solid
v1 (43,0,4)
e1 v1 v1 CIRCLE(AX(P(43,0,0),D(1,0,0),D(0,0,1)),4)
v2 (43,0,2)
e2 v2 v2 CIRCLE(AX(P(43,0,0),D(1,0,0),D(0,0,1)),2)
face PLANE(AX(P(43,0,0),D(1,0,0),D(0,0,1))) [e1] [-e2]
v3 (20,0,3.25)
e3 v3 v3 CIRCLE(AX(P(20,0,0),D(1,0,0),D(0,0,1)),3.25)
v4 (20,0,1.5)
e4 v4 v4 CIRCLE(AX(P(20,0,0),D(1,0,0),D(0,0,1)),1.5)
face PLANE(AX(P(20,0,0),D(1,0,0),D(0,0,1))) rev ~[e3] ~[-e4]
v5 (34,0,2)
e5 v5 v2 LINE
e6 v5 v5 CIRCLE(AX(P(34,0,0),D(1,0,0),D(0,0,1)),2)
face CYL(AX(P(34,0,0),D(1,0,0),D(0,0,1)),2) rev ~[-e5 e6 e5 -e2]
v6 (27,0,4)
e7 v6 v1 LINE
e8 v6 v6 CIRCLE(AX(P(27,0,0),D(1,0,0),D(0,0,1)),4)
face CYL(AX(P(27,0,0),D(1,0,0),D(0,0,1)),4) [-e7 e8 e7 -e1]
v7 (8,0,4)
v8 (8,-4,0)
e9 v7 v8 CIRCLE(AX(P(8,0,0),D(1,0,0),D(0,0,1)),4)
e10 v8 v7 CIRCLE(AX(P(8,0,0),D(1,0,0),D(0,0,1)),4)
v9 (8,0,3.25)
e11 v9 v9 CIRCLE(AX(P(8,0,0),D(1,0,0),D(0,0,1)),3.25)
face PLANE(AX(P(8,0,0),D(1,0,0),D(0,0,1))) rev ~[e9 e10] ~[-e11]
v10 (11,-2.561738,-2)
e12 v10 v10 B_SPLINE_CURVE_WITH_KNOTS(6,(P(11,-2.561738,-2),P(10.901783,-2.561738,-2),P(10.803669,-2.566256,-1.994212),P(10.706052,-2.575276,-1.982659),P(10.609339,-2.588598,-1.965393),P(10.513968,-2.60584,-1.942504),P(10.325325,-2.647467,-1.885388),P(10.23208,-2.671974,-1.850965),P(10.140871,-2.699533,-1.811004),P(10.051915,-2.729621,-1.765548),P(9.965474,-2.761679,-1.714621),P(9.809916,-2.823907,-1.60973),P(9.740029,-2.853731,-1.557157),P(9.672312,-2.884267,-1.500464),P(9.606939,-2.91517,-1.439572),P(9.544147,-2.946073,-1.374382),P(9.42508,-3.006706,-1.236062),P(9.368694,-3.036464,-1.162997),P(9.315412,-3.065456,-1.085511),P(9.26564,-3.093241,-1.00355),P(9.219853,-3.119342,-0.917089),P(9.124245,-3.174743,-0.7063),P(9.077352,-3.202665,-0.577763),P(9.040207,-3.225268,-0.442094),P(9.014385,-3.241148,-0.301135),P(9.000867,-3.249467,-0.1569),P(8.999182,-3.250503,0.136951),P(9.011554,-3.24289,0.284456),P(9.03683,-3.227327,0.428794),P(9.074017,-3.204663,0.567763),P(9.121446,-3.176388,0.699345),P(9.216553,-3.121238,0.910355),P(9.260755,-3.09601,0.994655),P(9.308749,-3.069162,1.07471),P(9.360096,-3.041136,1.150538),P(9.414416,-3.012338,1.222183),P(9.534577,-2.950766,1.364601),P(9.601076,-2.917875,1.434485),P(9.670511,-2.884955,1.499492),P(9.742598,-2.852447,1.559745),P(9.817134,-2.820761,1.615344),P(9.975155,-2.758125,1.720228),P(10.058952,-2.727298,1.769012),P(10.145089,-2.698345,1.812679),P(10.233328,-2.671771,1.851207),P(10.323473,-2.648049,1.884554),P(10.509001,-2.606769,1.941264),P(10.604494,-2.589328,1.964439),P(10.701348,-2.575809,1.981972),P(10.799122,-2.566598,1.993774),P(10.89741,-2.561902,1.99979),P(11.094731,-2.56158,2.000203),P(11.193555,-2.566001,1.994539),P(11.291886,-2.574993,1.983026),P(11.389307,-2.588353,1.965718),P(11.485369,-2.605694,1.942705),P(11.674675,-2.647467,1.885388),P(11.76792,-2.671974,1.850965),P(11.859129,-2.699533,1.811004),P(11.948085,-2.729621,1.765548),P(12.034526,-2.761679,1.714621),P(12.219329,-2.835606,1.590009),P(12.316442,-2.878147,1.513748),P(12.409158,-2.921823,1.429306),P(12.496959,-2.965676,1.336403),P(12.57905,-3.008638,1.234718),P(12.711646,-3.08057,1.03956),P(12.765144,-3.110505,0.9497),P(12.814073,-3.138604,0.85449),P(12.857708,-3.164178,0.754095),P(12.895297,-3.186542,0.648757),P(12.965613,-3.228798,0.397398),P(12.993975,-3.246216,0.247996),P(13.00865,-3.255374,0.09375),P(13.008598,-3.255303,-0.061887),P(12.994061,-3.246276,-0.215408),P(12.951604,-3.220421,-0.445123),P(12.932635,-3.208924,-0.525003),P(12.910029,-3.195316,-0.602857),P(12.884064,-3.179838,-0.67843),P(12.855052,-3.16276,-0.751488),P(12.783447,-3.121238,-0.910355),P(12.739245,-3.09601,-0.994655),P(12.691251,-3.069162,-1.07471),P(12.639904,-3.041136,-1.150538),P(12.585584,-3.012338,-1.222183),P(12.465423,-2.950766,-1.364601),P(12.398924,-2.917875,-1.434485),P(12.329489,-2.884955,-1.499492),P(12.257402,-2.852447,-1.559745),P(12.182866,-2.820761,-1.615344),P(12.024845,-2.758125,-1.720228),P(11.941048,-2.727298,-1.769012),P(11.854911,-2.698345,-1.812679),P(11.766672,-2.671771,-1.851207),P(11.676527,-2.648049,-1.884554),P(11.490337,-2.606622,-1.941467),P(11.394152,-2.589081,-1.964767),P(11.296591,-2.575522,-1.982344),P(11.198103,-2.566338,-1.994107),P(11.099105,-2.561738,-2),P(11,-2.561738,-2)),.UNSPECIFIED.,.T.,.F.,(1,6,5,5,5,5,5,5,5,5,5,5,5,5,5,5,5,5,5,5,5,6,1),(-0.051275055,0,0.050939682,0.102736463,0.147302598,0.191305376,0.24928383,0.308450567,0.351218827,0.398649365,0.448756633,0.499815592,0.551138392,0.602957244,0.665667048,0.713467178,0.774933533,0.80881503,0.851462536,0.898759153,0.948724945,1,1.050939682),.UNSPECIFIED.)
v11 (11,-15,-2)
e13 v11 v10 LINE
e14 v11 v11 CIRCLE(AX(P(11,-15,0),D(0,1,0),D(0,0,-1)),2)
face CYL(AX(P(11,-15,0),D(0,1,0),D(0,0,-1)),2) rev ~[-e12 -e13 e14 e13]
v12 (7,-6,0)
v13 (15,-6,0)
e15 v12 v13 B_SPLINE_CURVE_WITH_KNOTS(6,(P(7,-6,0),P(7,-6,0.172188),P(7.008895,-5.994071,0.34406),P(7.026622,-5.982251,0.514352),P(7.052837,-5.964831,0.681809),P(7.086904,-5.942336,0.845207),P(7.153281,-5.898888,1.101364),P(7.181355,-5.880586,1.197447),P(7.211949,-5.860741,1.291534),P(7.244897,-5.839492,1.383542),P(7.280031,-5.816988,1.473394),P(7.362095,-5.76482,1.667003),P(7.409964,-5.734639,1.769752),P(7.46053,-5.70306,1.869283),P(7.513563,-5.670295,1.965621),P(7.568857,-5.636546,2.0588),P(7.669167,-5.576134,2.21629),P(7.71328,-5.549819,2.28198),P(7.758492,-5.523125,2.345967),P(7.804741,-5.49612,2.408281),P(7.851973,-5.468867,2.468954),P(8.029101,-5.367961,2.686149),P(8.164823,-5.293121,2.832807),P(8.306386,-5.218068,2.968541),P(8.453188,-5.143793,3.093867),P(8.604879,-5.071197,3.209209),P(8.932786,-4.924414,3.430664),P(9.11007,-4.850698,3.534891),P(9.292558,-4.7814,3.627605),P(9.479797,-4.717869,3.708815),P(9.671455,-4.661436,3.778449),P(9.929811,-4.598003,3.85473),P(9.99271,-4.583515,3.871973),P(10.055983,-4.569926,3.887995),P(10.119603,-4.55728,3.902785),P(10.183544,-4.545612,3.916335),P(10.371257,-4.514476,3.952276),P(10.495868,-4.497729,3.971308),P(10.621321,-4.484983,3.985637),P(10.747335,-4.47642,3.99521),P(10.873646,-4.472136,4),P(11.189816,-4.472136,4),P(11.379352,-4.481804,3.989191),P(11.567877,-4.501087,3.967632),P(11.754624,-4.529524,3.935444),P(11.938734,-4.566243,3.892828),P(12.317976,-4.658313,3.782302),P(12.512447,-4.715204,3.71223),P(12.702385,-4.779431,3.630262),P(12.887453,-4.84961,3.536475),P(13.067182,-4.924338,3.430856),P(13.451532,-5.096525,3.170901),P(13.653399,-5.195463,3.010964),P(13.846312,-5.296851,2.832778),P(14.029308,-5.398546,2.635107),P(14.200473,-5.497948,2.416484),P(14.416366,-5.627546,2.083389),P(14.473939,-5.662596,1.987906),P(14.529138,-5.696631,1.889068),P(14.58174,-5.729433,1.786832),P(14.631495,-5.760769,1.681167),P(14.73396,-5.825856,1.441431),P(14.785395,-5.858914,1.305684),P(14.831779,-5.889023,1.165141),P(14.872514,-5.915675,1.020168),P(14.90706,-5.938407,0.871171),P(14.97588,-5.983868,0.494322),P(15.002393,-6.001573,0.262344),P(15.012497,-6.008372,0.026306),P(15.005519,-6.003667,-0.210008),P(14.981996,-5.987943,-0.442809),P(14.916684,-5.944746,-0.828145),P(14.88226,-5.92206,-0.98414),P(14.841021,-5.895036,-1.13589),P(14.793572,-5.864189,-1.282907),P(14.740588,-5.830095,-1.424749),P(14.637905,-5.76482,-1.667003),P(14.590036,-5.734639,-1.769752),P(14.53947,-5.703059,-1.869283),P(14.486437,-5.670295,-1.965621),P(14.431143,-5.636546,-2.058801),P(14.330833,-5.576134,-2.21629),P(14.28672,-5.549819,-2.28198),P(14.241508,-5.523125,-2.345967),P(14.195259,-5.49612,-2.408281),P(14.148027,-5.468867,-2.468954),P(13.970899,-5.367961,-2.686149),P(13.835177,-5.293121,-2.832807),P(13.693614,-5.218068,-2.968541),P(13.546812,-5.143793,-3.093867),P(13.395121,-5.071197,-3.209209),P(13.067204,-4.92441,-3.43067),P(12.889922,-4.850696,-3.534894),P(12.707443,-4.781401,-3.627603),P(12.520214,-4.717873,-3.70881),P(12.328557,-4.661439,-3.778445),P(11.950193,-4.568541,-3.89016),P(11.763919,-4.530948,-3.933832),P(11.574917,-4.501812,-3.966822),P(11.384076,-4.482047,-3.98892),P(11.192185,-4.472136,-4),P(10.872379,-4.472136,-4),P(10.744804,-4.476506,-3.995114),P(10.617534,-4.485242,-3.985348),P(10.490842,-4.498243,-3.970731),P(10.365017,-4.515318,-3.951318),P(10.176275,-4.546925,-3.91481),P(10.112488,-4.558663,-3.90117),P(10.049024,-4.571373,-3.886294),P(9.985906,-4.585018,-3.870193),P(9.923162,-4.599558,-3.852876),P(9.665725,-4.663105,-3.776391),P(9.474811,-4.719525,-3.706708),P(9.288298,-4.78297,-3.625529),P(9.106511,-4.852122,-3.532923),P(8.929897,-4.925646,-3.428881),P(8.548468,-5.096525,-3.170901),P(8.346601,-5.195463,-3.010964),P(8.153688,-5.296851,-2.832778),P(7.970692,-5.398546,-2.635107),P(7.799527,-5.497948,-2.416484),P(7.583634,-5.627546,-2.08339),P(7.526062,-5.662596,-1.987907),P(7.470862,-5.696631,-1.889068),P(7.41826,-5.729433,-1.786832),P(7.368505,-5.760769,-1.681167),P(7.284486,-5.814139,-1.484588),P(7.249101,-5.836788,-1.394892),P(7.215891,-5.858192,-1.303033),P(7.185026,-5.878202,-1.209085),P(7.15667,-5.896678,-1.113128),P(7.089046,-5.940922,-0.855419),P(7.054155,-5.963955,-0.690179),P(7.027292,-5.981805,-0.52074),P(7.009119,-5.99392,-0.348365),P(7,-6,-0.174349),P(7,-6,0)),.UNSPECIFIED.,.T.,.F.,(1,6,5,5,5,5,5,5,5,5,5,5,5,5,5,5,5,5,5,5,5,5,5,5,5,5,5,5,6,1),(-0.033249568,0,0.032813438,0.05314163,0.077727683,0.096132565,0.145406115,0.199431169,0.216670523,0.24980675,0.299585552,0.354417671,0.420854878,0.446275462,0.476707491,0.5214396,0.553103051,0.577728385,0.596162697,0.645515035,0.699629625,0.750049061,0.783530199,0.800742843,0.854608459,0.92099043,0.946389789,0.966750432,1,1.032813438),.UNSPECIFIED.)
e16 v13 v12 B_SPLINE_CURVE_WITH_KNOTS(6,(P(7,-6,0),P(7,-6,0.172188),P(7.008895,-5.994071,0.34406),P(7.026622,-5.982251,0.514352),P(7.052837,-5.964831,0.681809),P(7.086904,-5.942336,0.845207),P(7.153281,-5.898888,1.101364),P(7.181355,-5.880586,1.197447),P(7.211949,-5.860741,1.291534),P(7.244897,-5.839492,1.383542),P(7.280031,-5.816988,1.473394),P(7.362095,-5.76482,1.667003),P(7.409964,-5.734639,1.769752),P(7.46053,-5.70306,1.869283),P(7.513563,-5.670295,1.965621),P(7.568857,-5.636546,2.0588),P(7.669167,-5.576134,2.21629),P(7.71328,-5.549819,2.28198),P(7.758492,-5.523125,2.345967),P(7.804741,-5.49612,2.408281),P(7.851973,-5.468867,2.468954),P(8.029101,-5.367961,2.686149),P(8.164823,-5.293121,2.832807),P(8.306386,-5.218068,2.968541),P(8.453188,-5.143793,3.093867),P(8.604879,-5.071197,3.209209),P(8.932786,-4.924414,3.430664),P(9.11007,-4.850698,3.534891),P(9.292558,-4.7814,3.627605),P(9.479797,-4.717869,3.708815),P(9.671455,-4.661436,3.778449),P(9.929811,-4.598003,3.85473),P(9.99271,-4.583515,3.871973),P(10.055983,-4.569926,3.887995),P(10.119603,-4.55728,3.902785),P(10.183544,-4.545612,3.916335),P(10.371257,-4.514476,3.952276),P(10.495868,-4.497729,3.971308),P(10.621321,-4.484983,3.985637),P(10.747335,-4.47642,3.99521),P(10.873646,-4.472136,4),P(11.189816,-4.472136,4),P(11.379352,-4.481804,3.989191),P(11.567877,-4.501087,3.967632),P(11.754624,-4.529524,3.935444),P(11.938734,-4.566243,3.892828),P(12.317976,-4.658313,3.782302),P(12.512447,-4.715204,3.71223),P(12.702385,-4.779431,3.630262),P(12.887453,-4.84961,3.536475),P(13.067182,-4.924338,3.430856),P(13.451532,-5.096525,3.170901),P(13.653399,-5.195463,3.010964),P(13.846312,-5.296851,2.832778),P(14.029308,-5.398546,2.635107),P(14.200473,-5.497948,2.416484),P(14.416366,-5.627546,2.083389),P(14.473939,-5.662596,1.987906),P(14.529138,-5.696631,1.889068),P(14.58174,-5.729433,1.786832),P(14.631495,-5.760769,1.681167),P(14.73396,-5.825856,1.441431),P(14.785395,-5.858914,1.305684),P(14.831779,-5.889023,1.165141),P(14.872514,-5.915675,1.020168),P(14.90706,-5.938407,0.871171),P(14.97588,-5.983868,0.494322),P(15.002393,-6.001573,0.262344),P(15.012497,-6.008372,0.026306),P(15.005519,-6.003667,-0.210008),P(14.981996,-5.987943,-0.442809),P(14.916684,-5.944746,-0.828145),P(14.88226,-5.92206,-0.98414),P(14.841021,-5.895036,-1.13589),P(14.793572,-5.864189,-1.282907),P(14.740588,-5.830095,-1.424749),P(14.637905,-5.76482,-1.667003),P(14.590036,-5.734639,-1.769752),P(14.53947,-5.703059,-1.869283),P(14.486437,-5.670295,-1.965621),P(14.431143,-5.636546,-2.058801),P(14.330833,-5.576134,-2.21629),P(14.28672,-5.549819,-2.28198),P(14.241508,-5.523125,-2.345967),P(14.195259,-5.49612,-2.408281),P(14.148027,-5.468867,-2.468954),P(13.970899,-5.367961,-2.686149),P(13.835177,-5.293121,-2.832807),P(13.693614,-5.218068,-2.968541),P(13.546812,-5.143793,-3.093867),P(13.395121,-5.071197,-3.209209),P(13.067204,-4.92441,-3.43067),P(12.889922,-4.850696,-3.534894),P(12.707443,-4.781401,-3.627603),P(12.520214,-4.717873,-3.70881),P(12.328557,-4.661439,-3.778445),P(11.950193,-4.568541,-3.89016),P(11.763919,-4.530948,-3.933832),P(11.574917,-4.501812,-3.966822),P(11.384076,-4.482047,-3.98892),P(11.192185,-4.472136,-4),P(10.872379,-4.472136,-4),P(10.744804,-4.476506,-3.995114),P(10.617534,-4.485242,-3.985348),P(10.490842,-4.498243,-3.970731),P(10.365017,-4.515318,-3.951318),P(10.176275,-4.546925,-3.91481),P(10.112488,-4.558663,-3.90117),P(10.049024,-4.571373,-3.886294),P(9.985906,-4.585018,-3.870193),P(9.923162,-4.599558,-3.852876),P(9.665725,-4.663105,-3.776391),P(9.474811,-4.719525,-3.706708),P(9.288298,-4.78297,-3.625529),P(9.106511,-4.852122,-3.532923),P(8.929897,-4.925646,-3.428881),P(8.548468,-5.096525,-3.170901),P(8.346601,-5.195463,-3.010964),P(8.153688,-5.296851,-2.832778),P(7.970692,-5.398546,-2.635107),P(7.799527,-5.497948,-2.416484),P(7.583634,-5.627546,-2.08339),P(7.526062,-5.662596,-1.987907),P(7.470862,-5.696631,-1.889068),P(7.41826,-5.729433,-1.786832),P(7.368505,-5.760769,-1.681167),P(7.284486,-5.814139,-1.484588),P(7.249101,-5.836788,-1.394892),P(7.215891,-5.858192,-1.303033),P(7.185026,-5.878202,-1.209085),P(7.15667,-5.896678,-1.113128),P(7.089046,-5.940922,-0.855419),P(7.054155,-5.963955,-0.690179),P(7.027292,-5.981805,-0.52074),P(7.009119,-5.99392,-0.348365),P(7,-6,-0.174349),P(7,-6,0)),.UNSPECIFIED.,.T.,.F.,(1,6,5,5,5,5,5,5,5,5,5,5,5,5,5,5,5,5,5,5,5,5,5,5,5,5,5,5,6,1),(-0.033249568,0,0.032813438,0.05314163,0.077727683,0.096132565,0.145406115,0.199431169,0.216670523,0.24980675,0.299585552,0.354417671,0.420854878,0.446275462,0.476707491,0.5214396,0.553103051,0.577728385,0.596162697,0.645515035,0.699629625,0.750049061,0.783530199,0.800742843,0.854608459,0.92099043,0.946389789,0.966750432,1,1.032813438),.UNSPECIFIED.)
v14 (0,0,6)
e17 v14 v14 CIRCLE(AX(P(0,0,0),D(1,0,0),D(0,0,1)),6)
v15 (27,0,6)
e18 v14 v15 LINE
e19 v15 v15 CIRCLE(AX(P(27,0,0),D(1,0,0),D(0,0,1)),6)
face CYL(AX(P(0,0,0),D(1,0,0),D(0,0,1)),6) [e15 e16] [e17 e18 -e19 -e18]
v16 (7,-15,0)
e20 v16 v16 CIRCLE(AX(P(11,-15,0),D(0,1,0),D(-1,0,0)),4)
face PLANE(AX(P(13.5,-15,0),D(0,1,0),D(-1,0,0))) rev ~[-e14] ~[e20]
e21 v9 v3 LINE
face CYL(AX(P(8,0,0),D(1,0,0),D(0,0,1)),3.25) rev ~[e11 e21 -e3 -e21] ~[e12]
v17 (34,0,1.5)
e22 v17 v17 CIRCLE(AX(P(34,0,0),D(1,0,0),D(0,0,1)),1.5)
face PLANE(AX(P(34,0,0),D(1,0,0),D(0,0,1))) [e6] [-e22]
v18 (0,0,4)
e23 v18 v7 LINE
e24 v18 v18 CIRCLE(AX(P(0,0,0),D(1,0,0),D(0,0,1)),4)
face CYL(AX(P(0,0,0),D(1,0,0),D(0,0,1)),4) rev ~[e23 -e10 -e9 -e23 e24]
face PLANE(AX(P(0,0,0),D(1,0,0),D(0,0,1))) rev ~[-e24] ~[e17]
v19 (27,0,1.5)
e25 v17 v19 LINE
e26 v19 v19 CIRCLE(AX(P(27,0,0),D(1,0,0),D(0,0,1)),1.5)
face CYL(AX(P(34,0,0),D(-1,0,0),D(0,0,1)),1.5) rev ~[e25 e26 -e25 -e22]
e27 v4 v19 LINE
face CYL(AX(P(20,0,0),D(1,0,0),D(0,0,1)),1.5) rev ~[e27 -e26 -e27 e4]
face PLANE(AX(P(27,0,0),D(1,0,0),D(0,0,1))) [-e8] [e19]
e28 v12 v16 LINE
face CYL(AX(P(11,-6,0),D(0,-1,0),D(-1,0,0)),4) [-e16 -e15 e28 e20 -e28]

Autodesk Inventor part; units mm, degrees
ref_plane "YZ Plane" through (0, 0, 0) normal (1, 0, 0) x (0, 1, 0)
ref_plane "XY Plane" through (0, 0, 0) normal (0, 0, 1) x (1, 0, 0)
sketch "Sketch1" plane through (0, 0, 0) normal (0, 1, 0) x (-1, 0, 0)
  line L0 (0, 0) -> (-52, 0)
  line L1 (0, 4) -> (-8, 4)
  line L2 (0, 6) -> (-27, 6)
  line L3 (0, 0) -> (0, 37) construction
  line L4 (-8, 3.25) -> (-20, 3.25)
  line L5 (-8, 4) -> (-8, 3.25)
  line L6 (-20, 1.5) -> (-27, 1.5)
  line L7 (-20, 3.25) -> (-20, 1.5)
  line L8 (-27, 6) -> (-27, 4)
  line L9 (-27, 4) -> (-43, 4)
  line L10 (-34, 2) -> (-43, 2)
  line L11 (-43, 4) -> (-43, 2)
  line L12 (-34, 2) -> (-34, 1.5)
  line L13 (-34, 1.5) -> (-27, 1.5)
  line L14 (0, 6) -> (0, 4)
  point P0 (-8, 3.625)
  dimension "d0" = 8
  dimension "d1" = 12
  dimension "d2" = 27
  dimension "d3" = 6.5
  dimension "d4" = 8
  dimension "d5" = 20
  dimension "d6" = 3
  dimension "d7" = 8
  dimension "d8" = 16
  dimension "d9" = 4
  dimension "d10" = 9
revolve "Revolution1" add sketch "Sketch1" angle 360 about axis through (0, 0, 0) along (1, 0, 0)
thread "Thread1" size "M8x1.25" class "6g" standard "ANSI Metric M Profile" full length
thread "Thread2" size "M8x1.25" class "6H" standard "ANSI Metric M Profile" full length
ref_plane "Work Plane1" through (13.5, -6, 0) normal (0, 1, 0) x (-1, 0, 0)
sketch "Sketch2" plane through (13.5, -6, 0) normal (0, 1, 0) x (-1, 0, 0)
  circle A0 centre (2.5, 0) radius 4
  line L0 (13.5, 6) -> (13.5, -6) projected
  line L1 (13.5, 0) -> (-13.5, 0)
  line L2 (-13.5, 6) -> (-13.5, -6) projected
  dimension "d16" = 8
  dimension "d17" = 7
extrude "Extrusion1" add sketch "Sketch2" against normal blind 9
sketch "Sketch3" plane through (11, -15, 0) normal (0, -1, 0) x (1, 0, 0)
  circle A0 centre (0, 0) radius 4 projected
  point P0 (-11, 0)
extrude "Extrusion2" add sketch "Sketch2" along normal blind 2
hole "Hole2" at (11, -15, 0) direction (0, 1, 0) diameter 4 end up to surface
properties part number "HUDSON-1-81"
